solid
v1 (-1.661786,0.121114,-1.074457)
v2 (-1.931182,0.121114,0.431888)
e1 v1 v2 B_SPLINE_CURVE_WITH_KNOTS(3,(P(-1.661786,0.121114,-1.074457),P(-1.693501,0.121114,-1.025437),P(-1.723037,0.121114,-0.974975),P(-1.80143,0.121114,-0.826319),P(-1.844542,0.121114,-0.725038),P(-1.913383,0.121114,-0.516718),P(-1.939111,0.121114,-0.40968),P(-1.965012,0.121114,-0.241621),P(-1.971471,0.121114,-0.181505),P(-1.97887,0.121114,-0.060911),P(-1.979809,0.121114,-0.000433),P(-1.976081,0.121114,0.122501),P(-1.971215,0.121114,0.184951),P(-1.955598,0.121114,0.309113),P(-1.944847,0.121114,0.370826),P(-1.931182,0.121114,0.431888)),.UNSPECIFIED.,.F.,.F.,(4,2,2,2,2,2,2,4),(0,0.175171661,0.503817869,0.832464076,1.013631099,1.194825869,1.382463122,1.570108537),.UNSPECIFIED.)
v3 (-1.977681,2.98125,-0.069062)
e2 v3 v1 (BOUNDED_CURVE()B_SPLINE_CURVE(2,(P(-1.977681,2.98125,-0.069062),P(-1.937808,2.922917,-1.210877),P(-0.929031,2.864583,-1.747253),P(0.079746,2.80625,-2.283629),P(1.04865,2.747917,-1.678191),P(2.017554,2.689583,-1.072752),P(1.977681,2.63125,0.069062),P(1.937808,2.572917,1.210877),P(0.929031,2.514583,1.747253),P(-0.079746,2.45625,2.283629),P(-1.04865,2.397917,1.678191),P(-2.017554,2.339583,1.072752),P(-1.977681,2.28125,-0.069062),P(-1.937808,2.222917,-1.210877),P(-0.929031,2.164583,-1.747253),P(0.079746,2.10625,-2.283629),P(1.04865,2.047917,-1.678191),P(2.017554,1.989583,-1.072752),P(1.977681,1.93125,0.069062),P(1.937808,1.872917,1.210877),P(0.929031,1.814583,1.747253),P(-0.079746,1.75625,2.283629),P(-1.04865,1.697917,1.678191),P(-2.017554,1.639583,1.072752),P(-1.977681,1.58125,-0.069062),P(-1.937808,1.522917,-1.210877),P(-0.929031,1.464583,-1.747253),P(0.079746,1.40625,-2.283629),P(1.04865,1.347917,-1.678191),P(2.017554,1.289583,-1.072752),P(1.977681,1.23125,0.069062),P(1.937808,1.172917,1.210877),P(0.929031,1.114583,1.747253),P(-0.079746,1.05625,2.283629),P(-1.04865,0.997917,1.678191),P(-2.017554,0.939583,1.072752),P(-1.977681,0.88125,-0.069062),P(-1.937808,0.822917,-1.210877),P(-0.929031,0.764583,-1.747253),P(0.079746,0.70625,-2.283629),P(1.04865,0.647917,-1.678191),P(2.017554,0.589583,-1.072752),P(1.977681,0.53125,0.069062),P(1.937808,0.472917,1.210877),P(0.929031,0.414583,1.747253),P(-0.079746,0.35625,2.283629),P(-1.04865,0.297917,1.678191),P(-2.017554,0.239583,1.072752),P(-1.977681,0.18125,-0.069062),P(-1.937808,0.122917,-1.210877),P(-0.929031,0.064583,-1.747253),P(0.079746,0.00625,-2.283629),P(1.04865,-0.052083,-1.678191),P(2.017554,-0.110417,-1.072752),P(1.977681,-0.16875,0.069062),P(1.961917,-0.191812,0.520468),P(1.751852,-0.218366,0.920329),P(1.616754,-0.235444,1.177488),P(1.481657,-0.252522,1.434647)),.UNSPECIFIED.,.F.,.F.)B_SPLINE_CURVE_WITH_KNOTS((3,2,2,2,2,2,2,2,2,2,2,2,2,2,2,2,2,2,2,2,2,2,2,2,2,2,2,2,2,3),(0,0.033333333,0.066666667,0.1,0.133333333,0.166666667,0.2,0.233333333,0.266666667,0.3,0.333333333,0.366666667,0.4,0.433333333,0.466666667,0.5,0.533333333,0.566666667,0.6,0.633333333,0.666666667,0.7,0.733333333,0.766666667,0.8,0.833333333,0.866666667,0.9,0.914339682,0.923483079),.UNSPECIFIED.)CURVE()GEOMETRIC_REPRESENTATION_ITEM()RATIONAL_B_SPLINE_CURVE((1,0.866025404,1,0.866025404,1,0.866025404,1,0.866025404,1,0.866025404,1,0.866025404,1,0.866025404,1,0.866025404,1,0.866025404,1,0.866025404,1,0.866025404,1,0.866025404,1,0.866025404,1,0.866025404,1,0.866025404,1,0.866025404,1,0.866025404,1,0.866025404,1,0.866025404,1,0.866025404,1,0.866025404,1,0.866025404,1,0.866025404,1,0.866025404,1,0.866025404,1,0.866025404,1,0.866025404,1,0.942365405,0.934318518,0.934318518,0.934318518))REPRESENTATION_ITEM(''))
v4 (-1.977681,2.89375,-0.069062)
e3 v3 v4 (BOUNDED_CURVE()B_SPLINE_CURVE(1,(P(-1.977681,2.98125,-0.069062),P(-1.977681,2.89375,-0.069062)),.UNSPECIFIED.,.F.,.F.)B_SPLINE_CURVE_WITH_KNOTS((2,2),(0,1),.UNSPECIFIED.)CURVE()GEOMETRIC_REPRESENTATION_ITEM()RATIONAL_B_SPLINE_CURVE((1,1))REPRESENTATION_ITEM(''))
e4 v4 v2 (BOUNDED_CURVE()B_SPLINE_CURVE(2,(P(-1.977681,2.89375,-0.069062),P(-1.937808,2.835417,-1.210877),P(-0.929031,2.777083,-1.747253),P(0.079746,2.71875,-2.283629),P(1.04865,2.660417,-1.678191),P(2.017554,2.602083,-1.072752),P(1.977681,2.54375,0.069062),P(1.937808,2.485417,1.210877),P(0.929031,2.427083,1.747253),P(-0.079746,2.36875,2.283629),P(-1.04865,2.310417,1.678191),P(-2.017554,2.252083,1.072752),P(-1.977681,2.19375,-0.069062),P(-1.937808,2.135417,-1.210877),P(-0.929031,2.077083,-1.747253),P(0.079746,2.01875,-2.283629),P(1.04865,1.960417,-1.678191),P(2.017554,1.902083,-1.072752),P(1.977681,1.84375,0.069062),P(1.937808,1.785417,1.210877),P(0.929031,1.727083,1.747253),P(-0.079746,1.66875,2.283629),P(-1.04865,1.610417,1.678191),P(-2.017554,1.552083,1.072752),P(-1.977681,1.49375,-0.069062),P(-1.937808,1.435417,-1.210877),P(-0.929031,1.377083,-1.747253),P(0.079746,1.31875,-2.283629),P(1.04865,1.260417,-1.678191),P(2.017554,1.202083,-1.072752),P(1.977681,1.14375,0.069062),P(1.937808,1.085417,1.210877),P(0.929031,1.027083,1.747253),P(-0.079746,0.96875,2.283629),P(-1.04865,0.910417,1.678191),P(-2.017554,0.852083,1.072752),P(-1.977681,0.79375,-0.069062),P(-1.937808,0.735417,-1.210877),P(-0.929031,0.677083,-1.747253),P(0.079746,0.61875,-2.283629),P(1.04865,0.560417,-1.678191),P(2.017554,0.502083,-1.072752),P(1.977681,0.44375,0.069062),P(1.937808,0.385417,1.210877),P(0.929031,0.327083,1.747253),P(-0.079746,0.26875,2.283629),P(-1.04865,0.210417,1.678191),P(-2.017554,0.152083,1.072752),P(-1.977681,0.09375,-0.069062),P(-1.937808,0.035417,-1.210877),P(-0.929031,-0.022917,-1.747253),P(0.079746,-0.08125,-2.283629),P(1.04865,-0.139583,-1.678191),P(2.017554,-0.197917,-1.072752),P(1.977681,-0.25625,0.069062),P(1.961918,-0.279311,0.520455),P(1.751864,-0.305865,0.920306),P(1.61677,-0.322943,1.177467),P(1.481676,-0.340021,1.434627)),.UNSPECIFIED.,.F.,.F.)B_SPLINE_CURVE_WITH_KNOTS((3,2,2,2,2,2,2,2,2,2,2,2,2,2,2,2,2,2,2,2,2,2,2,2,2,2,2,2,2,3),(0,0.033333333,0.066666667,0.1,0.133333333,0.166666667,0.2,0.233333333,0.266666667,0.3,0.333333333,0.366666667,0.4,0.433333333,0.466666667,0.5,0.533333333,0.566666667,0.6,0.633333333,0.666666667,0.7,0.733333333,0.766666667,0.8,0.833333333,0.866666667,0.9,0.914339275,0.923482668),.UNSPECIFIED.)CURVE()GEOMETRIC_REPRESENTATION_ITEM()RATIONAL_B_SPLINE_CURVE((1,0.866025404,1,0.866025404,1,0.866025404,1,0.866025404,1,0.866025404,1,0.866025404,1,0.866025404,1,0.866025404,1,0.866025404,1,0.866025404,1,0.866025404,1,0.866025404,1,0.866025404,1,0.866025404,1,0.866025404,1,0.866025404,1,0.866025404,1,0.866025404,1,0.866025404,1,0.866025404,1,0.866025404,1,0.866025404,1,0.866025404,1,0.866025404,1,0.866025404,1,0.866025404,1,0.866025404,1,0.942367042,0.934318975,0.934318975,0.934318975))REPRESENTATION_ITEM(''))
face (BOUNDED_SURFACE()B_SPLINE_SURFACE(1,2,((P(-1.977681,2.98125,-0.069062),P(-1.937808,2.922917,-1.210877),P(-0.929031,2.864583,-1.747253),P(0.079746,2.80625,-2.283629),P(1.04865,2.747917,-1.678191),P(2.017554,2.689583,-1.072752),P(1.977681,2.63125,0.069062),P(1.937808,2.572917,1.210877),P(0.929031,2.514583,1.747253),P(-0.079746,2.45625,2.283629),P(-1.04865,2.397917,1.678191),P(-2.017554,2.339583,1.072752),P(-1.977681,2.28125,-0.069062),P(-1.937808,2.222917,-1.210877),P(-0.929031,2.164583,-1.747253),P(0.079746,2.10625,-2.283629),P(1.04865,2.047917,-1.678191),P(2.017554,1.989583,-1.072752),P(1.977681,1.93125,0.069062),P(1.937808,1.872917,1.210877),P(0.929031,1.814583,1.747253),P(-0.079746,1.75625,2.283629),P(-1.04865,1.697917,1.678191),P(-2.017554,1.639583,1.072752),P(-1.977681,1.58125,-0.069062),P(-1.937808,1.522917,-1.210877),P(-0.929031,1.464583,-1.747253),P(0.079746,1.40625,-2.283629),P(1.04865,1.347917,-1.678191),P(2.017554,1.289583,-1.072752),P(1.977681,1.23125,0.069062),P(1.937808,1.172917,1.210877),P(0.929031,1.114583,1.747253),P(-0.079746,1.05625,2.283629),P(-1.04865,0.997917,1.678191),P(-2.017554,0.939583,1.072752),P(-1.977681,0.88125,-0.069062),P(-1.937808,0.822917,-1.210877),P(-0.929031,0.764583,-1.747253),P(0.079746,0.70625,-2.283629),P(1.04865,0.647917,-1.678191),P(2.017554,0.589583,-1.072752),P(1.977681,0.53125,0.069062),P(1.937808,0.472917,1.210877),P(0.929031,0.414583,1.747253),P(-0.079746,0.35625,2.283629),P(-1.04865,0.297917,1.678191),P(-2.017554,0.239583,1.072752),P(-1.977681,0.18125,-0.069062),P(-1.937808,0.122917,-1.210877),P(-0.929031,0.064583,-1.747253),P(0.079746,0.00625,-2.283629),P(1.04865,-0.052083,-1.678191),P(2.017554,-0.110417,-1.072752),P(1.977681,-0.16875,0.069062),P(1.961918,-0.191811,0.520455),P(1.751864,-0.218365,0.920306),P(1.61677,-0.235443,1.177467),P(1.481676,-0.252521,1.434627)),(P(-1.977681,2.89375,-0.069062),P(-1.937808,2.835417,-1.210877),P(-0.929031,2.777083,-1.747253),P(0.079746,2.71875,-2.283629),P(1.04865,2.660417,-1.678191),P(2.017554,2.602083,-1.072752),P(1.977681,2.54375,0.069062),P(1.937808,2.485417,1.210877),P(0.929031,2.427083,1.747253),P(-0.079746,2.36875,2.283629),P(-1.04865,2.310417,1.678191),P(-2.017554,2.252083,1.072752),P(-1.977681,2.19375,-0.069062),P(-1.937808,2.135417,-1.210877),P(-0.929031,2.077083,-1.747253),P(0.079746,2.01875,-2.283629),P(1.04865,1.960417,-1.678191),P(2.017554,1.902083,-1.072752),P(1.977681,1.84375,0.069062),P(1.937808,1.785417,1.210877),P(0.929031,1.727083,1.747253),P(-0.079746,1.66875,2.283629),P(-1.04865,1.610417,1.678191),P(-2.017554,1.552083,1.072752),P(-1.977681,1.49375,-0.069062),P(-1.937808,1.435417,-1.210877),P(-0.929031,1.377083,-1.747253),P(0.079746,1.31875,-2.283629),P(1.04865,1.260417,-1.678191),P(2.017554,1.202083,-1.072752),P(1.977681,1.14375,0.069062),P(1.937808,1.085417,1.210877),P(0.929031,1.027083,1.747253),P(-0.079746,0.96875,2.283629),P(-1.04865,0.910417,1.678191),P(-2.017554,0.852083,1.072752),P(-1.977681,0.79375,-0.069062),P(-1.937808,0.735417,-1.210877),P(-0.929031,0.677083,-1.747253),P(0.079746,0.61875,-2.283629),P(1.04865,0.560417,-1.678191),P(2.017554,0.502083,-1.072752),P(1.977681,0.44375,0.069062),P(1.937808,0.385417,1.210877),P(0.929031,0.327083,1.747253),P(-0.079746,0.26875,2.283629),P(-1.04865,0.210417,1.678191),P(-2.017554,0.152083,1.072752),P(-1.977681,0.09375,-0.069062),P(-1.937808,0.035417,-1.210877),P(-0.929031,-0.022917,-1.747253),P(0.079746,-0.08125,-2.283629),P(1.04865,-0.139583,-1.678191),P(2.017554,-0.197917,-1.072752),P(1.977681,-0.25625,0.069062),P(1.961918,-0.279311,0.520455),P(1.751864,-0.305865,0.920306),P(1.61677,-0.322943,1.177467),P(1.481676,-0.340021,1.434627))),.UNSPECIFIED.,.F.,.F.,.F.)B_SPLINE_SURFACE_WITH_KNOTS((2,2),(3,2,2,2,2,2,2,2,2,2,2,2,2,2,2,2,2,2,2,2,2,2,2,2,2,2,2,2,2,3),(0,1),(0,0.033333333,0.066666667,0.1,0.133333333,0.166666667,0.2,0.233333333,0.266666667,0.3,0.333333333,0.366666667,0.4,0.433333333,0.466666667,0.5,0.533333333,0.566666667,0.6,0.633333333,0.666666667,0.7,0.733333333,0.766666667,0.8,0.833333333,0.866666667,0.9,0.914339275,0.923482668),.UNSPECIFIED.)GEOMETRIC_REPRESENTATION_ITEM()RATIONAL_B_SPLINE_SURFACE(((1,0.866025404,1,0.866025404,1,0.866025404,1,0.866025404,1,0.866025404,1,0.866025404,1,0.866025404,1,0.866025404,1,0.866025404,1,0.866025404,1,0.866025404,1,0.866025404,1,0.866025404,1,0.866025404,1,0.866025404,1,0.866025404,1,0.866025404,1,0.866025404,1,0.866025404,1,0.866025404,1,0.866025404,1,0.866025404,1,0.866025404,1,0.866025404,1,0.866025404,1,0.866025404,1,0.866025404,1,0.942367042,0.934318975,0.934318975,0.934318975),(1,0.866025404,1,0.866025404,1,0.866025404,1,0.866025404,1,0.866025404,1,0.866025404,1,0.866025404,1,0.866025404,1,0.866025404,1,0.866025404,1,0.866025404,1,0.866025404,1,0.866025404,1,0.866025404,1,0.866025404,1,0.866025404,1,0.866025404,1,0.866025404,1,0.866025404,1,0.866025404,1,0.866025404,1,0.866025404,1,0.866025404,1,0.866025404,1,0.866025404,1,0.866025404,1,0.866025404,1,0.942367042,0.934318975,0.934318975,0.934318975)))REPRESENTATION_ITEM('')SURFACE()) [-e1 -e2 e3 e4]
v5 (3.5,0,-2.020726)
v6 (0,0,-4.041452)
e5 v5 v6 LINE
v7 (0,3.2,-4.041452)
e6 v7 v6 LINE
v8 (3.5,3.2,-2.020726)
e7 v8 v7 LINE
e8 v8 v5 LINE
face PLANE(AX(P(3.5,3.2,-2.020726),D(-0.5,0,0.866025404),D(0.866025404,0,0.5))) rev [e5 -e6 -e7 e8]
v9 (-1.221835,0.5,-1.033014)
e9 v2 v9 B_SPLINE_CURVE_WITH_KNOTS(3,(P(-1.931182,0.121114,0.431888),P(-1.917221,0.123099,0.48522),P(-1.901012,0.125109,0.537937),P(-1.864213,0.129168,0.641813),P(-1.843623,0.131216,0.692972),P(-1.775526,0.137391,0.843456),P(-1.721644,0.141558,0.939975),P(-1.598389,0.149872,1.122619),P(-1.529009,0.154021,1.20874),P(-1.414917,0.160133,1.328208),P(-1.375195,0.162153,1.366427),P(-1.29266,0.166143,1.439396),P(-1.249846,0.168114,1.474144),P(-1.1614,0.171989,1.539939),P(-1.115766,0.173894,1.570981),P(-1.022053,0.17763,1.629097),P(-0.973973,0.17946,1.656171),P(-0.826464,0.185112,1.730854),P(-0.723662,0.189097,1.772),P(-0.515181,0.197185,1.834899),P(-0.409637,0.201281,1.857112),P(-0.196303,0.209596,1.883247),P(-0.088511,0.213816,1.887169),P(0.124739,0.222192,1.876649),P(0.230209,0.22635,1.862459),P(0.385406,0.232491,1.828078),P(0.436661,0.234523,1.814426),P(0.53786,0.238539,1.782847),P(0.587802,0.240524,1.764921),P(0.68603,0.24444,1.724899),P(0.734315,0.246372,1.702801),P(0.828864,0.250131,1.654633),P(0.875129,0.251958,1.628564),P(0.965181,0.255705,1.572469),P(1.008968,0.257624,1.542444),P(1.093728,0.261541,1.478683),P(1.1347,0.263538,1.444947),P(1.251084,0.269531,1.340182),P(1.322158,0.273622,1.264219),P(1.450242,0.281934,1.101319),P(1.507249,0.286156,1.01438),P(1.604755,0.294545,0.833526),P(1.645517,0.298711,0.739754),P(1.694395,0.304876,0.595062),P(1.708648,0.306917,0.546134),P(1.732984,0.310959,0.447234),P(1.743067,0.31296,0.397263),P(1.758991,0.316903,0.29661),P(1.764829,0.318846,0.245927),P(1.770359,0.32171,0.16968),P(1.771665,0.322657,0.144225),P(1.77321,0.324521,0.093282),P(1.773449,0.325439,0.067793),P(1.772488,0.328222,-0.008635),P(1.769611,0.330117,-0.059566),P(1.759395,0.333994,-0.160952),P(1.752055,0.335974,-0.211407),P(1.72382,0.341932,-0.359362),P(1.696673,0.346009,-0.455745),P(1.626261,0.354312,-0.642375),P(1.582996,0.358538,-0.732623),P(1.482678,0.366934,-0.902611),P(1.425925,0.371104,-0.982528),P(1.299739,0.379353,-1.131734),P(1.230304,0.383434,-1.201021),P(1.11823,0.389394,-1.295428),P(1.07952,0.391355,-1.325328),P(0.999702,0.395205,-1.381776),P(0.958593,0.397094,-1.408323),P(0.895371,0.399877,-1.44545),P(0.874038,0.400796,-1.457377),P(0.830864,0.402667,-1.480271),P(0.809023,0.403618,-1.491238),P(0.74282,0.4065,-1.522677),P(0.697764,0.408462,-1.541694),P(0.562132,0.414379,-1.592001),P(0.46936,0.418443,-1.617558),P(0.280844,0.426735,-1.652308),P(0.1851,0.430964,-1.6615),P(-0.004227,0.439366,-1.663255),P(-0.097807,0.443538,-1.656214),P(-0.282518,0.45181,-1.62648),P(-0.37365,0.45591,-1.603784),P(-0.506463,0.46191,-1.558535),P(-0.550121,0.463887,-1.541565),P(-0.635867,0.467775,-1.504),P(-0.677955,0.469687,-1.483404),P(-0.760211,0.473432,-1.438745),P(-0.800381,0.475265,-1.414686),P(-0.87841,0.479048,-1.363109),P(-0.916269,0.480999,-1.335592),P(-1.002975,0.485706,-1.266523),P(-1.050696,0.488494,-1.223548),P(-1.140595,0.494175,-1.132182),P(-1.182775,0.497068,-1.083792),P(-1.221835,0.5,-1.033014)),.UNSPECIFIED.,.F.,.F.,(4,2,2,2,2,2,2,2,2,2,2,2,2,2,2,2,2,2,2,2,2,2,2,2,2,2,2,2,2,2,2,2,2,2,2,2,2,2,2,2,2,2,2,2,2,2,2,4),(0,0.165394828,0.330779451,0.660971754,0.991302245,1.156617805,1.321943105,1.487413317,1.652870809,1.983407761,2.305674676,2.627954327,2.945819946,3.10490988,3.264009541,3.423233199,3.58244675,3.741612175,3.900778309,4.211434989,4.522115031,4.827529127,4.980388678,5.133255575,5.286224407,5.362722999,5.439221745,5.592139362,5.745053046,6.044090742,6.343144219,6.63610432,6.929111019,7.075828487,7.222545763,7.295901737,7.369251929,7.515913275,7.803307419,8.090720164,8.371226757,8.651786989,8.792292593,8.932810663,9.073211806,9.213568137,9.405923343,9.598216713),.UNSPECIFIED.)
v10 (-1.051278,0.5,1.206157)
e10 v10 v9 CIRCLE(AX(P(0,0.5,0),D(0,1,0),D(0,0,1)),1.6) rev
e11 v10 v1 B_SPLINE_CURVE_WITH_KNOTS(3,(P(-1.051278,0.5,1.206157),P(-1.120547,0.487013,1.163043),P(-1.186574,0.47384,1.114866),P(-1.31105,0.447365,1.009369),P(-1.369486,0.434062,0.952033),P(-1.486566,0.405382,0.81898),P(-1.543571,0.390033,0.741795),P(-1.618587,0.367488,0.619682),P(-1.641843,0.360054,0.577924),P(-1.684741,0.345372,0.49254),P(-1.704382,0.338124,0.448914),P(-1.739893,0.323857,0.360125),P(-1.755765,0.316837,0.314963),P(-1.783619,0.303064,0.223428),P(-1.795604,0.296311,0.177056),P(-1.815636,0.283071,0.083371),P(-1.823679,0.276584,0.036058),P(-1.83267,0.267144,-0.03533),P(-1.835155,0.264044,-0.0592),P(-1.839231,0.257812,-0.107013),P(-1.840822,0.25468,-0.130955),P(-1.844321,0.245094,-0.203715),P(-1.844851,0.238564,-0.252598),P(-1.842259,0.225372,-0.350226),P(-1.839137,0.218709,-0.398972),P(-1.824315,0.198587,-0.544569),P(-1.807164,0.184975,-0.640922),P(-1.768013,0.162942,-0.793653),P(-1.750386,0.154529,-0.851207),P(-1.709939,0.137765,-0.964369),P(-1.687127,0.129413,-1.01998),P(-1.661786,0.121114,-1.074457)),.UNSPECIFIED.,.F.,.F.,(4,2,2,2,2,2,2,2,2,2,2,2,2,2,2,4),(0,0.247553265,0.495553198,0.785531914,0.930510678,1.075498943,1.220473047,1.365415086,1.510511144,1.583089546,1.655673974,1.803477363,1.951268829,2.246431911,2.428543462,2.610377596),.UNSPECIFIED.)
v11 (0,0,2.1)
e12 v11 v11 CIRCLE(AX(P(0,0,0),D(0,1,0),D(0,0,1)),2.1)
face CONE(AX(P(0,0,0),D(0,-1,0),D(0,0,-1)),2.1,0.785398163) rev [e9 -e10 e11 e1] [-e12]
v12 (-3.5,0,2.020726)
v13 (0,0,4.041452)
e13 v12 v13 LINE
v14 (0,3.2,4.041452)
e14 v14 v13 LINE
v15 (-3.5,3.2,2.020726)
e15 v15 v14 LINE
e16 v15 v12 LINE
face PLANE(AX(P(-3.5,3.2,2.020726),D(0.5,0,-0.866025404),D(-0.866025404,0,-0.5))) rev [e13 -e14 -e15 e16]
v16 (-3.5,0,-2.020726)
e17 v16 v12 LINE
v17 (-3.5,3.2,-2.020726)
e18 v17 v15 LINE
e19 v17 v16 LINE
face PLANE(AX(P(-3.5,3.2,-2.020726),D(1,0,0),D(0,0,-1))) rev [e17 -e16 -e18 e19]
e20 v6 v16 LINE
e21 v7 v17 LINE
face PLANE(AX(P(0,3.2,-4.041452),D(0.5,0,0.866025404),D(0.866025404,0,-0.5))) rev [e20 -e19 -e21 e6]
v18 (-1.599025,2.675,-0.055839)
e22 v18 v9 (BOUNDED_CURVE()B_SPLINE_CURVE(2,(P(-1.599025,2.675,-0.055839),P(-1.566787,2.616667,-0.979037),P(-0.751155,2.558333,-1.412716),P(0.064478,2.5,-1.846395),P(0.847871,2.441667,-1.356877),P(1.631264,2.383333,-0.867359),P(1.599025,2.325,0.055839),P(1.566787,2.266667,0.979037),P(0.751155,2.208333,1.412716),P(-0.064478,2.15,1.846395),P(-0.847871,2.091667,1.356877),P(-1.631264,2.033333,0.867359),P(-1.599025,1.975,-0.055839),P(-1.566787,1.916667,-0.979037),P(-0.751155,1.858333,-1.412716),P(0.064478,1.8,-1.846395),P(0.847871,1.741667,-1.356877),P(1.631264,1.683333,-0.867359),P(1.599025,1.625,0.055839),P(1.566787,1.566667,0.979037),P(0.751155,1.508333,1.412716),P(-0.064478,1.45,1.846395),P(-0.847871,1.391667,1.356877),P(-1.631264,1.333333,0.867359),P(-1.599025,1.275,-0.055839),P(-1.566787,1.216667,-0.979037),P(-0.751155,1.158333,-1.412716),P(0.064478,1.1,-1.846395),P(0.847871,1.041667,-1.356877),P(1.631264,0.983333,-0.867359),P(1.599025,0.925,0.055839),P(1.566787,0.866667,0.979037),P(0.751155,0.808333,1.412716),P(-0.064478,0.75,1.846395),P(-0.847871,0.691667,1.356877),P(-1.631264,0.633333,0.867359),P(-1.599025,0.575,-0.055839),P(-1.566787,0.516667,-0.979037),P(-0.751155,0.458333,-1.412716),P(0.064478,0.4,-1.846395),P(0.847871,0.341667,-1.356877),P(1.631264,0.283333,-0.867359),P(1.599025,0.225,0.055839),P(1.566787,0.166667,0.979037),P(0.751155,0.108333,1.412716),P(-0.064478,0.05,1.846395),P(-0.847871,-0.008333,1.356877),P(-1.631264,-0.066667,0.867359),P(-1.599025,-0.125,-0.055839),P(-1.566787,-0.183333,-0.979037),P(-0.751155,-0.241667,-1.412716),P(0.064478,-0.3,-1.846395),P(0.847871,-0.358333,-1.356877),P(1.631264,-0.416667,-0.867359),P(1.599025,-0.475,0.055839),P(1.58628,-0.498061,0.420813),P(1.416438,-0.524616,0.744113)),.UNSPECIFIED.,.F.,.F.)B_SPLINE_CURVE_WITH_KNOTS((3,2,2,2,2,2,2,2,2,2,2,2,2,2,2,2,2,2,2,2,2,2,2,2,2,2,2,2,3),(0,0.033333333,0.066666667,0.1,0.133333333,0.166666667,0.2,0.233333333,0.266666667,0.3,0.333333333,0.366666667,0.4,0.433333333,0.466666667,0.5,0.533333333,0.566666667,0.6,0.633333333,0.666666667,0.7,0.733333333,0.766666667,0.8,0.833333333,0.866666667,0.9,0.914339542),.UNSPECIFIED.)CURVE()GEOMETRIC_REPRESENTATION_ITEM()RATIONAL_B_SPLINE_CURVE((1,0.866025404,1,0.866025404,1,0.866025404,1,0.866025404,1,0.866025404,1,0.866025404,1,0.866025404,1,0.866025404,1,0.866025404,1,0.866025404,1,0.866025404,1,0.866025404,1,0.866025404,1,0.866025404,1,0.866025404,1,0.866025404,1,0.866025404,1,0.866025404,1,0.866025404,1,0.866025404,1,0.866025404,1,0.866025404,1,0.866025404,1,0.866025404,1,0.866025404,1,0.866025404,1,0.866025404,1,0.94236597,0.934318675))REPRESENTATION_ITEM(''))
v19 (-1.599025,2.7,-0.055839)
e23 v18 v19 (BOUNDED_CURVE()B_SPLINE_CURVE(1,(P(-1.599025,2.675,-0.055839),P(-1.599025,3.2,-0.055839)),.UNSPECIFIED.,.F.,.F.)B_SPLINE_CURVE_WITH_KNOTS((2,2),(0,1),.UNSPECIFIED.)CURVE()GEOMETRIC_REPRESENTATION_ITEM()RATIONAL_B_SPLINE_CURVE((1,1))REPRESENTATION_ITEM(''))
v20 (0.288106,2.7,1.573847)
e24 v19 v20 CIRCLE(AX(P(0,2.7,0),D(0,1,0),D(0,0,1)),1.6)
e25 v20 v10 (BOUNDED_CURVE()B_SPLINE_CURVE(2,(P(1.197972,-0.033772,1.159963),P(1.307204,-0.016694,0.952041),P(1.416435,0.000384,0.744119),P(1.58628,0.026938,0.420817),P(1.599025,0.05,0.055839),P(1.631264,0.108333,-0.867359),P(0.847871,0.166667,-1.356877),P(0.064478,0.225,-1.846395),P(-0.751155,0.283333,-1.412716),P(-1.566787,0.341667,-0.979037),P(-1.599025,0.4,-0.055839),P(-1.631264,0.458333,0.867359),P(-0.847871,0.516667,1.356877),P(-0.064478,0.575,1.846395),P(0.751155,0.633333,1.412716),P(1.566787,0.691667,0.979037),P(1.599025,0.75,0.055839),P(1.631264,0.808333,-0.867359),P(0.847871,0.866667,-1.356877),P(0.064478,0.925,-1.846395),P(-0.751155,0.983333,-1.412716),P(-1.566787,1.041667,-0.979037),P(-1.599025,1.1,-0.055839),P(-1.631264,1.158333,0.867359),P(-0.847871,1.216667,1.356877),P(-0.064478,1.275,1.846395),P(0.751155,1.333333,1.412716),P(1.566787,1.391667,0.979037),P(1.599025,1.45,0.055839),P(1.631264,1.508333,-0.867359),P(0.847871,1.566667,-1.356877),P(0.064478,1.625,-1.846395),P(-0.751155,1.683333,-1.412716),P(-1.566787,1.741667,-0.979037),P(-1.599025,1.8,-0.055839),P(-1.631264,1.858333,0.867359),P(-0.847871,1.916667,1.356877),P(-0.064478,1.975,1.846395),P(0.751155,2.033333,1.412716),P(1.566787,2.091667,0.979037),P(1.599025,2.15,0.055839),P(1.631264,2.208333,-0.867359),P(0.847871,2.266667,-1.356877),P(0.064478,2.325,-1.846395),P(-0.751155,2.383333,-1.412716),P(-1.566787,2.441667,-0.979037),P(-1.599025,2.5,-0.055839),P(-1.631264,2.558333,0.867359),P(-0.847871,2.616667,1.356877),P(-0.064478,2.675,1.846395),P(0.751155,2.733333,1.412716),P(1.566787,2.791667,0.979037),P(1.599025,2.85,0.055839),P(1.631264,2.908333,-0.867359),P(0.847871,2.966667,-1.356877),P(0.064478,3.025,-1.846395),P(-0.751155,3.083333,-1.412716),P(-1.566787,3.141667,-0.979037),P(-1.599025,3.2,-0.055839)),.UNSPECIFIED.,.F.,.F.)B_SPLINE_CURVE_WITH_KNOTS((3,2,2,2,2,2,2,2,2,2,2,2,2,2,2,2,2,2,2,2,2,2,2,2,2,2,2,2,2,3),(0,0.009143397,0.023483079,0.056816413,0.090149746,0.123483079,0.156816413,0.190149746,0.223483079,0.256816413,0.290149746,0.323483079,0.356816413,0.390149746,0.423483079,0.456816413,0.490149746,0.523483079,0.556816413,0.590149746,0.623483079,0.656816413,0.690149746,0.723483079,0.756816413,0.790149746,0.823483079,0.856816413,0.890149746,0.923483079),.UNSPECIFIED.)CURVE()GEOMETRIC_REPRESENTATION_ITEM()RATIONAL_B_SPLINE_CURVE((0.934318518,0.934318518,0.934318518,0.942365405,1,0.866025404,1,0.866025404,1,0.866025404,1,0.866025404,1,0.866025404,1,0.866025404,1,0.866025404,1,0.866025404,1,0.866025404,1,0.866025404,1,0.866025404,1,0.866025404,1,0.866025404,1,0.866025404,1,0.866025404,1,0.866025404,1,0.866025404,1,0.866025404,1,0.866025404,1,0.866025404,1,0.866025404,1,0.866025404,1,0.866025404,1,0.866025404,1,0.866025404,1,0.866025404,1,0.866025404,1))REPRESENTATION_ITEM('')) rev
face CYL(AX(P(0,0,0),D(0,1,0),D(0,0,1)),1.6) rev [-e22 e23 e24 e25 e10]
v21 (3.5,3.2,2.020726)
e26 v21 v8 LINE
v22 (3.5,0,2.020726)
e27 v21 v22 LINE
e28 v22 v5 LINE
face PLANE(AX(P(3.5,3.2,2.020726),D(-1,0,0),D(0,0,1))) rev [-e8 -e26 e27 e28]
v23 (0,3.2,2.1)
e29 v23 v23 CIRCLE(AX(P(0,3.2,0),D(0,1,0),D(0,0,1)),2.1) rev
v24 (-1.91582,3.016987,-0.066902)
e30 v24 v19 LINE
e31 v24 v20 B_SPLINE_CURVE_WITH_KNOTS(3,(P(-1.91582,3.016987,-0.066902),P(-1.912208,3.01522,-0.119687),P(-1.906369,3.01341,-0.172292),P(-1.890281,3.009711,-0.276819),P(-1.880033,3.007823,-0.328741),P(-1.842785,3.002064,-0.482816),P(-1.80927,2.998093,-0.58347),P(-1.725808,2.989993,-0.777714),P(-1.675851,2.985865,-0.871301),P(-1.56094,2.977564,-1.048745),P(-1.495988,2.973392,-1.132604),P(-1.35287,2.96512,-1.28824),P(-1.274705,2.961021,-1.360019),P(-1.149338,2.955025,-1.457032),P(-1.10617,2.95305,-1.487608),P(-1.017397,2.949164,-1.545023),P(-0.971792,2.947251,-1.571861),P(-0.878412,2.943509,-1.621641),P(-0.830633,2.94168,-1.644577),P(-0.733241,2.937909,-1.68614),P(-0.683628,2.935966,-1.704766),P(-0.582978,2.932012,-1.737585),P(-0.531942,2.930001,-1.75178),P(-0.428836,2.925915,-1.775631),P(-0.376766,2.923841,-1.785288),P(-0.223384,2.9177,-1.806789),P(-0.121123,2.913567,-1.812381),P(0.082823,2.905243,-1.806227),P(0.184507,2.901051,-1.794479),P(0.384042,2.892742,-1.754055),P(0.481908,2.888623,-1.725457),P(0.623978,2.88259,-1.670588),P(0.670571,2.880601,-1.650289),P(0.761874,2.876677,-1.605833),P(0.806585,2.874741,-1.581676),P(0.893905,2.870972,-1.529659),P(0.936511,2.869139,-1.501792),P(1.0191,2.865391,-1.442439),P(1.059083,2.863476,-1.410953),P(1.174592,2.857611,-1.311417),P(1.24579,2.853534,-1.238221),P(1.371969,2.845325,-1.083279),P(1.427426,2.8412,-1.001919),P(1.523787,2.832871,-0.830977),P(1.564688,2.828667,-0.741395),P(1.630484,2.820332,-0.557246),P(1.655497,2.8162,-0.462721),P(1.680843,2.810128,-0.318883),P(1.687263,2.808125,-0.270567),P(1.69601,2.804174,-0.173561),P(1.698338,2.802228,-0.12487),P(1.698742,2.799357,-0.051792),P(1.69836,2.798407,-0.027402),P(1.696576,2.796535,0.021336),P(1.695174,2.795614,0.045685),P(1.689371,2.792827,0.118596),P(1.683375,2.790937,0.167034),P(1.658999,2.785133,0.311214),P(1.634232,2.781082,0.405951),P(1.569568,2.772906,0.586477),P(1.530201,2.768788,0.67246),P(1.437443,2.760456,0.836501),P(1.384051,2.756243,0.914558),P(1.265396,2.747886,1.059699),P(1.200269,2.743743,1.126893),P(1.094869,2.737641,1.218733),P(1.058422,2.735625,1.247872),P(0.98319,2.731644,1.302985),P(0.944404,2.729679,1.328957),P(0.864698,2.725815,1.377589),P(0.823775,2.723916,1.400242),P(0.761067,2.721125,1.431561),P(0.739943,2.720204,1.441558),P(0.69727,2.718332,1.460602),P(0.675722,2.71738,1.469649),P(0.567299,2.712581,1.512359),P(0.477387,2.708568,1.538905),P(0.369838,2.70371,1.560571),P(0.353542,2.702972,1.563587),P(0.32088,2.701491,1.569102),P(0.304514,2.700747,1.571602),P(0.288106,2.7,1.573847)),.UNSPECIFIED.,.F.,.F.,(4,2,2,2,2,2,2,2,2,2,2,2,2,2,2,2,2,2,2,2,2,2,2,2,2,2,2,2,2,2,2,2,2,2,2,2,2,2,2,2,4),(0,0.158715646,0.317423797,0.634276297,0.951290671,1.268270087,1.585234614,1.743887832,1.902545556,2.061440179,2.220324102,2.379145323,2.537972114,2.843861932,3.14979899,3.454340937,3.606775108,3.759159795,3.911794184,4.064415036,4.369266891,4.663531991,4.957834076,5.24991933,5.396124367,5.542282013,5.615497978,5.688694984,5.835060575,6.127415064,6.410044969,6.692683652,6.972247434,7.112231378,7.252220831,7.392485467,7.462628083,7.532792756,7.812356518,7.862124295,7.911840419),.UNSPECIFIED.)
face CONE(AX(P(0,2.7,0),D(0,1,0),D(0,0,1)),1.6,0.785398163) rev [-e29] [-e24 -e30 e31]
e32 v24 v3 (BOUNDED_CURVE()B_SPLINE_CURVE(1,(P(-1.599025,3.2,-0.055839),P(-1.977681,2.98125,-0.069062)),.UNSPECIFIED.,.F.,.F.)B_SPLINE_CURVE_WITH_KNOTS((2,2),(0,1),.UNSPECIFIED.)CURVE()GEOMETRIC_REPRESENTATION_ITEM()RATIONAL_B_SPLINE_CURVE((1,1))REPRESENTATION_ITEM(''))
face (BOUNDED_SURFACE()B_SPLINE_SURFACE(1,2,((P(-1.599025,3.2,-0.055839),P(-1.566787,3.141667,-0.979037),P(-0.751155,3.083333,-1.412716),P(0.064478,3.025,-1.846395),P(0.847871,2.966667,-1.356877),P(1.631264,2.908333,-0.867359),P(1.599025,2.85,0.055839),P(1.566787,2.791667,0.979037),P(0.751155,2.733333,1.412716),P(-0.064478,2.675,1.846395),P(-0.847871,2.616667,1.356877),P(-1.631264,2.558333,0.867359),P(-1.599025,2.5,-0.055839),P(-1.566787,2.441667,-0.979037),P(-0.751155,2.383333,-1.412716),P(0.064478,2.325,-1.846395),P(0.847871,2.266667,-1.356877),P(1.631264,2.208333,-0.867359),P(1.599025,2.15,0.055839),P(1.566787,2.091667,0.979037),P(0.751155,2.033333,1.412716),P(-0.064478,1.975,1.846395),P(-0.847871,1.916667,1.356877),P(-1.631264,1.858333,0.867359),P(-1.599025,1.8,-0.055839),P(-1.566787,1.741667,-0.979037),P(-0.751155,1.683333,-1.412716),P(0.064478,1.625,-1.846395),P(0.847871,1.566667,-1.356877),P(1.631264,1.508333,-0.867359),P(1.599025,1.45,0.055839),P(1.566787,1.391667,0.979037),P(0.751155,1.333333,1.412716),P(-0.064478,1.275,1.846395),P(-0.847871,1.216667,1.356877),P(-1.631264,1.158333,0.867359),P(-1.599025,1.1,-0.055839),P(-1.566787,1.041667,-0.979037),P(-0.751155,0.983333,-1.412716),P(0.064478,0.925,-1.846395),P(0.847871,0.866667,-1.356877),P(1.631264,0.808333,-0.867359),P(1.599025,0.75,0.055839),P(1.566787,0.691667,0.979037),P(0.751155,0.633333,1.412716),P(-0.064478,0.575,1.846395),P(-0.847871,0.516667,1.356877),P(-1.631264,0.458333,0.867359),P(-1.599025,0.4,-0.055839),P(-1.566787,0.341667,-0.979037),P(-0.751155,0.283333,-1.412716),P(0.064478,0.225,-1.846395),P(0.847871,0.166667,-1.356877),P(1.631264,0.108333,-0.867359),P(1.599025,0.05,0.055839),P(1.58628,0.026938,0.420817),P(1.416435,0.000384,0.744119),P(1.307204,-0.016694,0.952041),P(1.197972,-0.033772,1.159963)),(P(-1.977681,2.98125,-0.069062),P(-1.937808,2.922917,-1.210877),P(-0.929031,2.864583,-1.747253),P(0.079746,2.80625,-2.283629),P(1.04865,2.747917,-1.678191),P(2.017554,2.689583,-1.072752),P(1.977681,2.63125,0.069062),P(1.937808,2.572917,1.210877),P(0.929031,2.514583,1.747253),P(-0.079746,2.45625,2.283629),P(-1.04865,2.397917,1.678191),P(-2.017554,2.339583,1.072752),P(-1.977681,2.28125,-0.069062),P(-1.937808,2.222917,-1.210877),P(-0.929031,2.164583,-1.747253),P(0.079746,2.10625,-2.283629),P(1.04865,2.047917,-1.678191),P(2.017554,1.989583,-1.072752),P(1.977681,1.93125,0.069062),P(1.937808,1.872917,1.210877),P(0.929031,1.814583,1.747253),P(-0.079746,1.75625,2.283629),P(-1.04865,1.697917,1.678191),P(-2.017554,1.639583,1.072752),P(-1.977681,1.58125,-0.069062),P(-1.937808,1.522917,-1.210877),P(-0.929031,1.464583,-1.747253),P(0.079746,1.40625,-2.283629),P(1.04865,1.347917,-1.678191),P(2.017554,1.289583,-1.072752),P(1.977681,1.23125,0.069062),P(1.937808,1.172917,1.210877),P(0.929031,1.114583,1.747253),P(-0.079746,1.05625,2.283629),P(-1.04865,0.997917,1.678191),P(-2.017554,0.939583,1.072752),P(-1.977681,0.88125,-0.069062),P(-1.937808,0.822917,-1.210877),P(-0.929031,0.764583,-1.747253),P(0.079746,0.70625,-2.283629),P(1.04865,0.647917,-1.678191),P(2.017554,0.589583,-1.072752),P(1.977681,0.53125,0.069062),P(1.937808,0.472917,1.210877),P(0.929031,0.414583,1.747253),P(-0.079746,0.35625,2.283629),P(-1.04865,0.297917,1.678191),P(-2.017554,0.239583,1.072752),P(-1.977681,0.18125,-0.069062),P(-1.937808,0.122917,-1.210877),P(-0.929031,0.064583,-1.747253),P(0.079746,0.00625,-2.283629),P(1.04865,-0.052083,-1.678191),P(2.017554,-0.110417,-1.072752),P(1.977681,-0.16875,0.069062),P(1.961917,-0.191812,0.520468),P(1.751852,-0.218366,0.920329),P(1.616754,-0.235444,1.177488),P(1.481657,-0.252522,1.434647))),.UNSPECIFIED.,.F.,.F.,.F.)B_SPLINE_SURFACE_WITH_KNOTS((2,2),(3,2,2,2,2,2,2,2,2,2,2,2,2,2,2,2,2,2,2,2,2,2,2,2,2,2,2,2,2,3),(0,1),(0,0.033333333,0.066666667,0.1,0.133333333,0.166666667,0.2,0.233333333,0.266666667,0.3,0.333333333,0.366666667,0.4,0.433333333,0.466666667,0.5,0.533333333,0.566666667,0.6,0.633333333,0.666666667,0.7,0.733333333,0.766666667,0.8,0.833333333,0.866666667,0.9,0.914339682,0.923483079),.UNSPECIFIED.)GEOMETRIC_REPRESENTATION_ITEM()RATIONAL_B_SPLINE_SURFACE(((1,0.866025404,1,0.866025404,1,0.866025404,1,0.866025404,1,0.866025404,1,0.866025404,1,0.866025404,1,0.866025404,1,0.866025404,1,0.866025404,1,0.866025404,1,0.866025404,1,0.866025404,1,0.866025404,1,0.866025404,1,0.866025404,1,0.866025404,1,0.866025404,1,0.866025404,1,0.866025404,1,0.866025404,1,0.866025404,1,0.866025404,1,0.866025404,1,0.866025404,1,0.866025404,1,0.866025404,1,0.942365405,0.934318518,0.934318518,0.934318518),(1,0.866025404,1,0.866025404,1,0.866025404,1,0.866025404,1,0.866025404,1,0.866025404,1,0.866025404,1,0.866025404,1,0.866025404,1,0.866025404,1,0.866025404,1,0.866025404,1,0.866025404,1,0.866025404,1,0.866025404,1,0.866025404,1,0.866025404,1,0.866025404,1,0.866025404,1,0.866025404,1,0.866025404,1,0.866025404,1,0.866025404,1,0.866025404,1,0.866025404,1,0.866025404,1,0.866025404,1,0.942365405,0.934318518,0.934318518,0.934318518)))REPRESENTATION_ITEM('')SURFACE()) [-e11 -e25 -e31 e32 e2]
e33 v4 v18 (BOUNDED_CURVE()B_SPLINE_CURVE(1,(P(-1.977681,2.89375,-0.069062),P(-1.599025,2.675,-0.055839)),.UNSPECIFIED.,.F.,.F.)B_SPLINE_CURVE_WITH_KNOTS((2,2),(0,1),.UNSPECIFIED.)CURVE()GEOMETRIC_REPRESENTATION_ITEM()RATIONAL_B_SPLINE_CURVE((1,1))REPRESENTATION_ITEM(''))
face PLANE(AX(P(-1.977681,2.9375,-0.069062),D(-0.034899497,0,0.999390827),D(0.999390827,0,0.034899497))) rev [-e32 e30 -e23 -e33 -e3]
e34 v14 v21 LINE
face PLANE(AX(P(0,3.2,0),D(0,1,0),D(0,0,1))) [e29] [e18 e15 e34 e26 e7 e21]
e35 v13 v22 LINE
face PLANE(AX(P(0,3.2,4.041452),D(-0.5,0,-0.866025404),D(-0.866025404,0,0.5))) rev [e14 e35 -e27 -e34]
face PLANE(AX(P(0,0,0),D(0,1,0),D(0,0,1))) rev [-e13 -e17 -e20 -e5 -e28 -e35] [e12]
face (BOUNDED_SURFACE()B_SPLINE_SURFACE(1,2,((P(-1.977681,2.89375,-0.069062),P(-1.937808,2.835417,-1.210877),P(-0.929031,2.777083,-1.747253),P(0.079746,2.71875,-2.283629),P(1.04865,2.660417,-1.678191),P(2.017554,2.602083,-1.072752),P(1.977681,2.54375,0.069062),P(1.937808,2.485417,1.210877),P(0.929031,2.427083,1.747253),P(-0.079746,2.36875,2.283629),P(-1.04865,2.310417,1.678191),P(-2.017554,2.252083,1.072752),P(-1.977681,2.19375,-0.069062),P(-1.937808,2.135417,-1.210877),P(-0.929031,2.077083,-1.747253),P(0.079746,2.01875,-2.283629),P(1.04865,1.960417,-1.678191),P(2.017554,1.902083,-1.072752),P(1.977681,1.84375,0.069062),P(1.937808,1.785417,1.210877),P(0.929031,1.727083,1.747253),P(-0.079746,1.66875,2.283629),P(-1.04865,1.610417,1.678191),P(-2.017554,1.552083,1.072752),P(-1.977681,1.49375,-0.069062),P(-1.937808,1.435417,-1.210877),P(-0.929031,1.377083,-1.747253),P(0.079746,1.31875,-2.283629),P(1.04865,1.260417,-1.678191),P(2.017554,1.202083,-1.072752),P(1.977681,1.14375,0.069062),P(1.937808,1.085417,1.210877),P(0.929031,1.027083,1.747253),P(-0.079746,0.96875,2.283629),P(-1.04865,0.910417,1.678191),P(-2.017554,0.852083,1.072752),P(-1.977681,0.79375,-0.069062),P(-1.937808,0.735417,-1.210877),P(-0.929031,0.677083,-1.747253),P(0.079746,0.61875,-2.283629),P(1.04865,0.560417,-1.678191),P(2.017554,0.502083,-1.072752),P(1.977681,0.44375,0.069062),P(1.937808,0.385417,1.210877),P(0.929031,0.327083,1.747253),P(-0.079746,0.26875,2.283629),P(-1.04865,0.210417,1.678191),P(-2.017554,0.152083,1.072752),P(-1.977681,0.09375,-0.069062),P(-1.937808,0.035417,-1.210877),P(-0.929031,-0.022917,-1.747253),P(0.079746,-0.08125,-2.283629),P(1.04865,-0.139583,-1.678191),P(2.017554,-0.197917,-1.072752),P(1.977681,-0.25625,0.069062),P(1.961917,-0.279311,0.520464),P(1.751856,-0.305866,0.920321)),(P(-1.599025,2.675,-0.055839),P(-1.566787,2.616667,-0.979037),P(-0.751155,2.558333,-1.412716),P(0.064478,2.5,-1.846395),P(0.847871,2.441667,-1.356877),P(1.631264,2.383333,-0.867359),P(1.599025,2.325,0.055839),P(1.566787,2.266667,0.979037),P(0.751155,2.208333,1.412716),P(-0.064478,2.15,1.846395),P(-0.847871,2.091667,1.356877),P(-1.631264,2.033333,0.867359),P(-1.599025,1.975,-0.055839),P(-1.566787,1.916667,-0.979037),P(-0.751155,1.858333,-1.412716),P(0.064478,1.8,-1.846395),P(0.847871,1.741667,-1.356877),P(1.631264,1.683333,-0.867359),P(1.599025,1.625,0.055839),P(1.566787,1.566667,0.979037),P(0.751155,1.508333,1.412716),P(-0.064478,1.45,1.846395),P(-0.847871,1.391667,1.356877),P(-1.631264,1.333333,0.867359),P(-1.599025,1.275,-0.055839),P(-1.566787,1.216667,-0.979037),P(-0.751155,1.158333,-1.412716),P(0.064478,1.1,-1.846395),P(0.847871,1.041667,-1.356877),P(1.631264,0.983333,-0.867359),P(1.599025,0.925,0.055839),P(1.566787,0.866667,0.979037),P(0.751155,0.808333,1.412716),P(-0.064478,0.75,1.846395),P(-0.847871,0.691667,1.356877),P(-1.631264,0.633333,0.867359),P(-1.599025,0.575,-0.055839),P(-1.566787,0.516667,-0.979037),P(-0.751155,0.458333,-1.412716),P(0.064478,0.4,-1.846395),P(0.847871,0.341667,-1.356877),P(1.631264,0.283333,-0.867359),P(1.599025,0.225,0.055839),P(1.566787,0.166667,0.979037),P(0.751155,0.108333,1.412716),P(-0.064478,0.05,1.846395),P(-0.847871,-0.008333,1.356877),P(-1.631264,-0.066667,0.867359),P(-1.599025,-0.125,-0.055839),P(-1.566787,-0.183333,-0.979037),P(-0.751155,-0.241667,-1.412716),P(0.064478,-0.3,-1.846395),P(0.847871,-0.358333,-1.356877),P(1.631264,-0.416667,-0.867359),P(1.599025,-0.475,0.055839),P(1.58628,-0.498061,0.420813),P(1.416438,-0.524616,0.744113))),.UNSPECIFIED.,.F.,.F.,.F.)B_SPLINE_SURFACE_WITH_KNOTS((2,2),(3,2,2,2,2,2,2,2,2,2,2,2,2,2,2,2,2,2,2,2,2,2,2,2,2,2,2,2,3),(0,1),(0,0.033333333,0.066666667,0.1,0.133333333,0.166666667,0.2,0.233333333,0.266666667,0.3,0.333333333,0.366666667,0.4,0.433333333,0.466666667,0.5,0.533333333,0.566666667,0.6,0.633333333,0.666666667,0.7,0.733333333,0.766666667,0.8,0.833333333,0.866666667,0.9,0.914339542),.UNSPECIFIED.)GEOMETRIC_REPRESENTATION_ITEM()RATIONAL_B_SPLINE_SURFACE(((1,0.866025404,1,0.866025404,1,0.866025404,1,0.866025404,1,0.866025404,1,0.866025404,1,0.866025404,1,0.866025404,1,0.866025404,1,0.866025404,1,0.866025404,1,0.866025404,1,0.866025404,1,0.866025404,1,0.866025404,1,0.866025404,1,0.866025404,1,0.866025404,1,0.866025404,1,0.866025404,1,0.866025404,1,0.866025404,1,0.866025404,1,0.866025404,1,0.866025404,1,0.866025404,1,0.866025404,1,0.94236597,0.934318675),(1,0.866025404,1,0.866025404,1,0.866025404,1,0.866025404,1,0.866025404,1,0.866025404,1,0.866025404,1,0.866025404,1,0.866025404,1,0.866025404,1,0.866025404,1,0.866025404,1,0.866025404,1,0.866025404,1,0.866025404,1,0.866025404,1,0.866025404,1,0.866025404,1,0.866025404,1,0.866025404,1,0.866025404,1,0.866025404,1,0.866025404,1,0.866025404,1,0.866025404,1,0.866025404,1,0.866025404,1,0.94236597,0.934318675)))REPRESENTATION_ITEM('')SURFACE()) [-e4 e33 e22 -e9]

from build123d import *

# Parameters (mm, degrees)
BOSS_EXTRUDE1_DEPTH = 3.2
SKETCH2_R           = 1.6
CUT_EXTRUDE1_DEPTH  = 3.2
CHAMFER1_SIZE       = 0.5
THREAD1_PITCH       = 0.7


with BuildPart() as part:
    # Sketch1 → Boss-Extrude1 (new body)
    with BuildSketch(Plane(origin=(0, 0, 0), x_dir=(1, 0, 0), z_dir=(0, 1, 0))):
        Polygon((0, 4.041451884), (-3.5, 2.020725942), (-3.5, -2.020725942), (0, -4.041451884), (3.5, -2.020725942), (3.5, 2.020725942), align=None)
    extrude(amount=BOSS_EXTRUDE1_DEPTH)

    # Sketch2 → Cut-Extrude1 (cut)
    with BuildSketch(Plane(origin=(0, 3.2, 0), x_dir=(1, 0, 0), z_dir=(0, 1, 0))):
        with Locations(Location((0, 0, 0), (0, 0, 270))):
            Circle(SKETCH2_R)
    extrude(amount=-CUT_EXTRUDE1_DEPTH, mode=Mode.SUBTRACT)

    # Chamfer1
    chamfer1_edges = [part.edges().sort_by_distance(p)[0] for p in [
        (0, 0, -1.6),
        (0, 3.2, -1.6),
    ]]
    chamfer(chamfer1_edges, length=CHAMFER1_SIZE)

    # Thread1: the profile of Thread Profile1 profile screwed along a right-hand helix of 4.571429 turns, 6 arcs to a turn; built about Z, then put on its axis
    thread1_z = Axis((0, 0, 0), (0, 0, 1))
    thread1_corners = [(1.5997, 0, -0.000173205), (1.978886113, -1e-09, 0.218749999), (1.978886113, -1e-09, 0.306249999), (1.5997, 0, 0.525173203)]
    with BuildLine(mode=Mode.PRIVATE) as thread1_profile:
        Line(thread1_corners[0], thread1_corners[1])
        Line(thread1_corners[1], thread1_corners[2])
        Line(thread1_corners[2], thread1_corners[3])
        Line(thread1_corners[3], thread1_corners[0])
    thread1_cap = Face(thread1_profile.wire())
    thread1_turn_angles = [0, 30, 60, 90, 120, 150, 180, 210, 240, 270, 300, 330, 360]
    thread1_turn_weights = [1, 0.8660254037844387, 1, 0.8660254037844387, 1, 0.8660254037844387, 1, 0.8660254037844387, 1, 0.8660254037844387, 1, 0.8660254037844387, 1]
    thread1_turn_rails = [Edge.make_bspline([Vector(p[0], p[1], 0).rotate(thread1_z, thread1_turn_angles[k]) / thread1_turn_weights[k] + Vector(0, 0, p[2] + THREAD1_PITCH * thread1_turn_angles[k] / 360) for k in range(13)], [0, 0, 0, 1, 1, 2, 2, 3, 3, 4, 4, 5, 5, 6, 6, 6], 2, thread1_turn_weights) for p in thread1_corners]
    thread1_turn_sides = [Face.make_surface_from_curves(thread1_turn_rails[p[0]], thread1_turn_rails[p[1]]) for p in [(0, 1), (1, 2), (2, 3), (3, 0)]]
    thread1_last_angles = [1440, 1470, 1500, 1530, 1560, 1590, 1620, 1632.857142857, 1645.714285714]
    thread1_last_weights = [1, 0.8660254037844387, 1, 0.8660254037844387, 1, 0.8660254037844387, 1, 0.9749279121818266, 1]
    thread1_last_rails = [Edge.make_bspline([Vector(p[0], p[1], 0).rotate(thread1_z, thread1_last_angles[k]) / thread1_last_weights[k] + Vector(0, 0, p[2] + THREAD1_PITCH * thread1_last_angles[k] / 360) for k in range(9)], [0, 0, 0, 1, 1, 2, 2, 3, 3, 4, 4, 4], 2, thread1_last_weights) for p in thread1_corners]
    thread1_last_sides = [Face.make_surface_from_curves(thread1_last_rails[p[0]], thread1_last_rails[p[1]]) for p in [(0, 1), (1, 2), (2, 3), (3, 0)]]
    thread1 = Plane(origin=(0, 3.2, 0), x_dir=(-0.999390827, 0, -0.034899497), z_dir=(0, -1, 0)) * Solid(Shell([*[p.moved(Location((0, 0, THREAD1_PITCH * i))) for i in range(4) for p in thread1_turn_sides], *thread1_last_sides, thread1_cap, thread1_cap.rotate(thread1_z, 1645.714285714).moved(Location((0, 0, THREAD1_PITCH * 1645.714285714 / 360)))]))
    add(thread1, mode=Mode.SUBTRACT)


solid = part.part
